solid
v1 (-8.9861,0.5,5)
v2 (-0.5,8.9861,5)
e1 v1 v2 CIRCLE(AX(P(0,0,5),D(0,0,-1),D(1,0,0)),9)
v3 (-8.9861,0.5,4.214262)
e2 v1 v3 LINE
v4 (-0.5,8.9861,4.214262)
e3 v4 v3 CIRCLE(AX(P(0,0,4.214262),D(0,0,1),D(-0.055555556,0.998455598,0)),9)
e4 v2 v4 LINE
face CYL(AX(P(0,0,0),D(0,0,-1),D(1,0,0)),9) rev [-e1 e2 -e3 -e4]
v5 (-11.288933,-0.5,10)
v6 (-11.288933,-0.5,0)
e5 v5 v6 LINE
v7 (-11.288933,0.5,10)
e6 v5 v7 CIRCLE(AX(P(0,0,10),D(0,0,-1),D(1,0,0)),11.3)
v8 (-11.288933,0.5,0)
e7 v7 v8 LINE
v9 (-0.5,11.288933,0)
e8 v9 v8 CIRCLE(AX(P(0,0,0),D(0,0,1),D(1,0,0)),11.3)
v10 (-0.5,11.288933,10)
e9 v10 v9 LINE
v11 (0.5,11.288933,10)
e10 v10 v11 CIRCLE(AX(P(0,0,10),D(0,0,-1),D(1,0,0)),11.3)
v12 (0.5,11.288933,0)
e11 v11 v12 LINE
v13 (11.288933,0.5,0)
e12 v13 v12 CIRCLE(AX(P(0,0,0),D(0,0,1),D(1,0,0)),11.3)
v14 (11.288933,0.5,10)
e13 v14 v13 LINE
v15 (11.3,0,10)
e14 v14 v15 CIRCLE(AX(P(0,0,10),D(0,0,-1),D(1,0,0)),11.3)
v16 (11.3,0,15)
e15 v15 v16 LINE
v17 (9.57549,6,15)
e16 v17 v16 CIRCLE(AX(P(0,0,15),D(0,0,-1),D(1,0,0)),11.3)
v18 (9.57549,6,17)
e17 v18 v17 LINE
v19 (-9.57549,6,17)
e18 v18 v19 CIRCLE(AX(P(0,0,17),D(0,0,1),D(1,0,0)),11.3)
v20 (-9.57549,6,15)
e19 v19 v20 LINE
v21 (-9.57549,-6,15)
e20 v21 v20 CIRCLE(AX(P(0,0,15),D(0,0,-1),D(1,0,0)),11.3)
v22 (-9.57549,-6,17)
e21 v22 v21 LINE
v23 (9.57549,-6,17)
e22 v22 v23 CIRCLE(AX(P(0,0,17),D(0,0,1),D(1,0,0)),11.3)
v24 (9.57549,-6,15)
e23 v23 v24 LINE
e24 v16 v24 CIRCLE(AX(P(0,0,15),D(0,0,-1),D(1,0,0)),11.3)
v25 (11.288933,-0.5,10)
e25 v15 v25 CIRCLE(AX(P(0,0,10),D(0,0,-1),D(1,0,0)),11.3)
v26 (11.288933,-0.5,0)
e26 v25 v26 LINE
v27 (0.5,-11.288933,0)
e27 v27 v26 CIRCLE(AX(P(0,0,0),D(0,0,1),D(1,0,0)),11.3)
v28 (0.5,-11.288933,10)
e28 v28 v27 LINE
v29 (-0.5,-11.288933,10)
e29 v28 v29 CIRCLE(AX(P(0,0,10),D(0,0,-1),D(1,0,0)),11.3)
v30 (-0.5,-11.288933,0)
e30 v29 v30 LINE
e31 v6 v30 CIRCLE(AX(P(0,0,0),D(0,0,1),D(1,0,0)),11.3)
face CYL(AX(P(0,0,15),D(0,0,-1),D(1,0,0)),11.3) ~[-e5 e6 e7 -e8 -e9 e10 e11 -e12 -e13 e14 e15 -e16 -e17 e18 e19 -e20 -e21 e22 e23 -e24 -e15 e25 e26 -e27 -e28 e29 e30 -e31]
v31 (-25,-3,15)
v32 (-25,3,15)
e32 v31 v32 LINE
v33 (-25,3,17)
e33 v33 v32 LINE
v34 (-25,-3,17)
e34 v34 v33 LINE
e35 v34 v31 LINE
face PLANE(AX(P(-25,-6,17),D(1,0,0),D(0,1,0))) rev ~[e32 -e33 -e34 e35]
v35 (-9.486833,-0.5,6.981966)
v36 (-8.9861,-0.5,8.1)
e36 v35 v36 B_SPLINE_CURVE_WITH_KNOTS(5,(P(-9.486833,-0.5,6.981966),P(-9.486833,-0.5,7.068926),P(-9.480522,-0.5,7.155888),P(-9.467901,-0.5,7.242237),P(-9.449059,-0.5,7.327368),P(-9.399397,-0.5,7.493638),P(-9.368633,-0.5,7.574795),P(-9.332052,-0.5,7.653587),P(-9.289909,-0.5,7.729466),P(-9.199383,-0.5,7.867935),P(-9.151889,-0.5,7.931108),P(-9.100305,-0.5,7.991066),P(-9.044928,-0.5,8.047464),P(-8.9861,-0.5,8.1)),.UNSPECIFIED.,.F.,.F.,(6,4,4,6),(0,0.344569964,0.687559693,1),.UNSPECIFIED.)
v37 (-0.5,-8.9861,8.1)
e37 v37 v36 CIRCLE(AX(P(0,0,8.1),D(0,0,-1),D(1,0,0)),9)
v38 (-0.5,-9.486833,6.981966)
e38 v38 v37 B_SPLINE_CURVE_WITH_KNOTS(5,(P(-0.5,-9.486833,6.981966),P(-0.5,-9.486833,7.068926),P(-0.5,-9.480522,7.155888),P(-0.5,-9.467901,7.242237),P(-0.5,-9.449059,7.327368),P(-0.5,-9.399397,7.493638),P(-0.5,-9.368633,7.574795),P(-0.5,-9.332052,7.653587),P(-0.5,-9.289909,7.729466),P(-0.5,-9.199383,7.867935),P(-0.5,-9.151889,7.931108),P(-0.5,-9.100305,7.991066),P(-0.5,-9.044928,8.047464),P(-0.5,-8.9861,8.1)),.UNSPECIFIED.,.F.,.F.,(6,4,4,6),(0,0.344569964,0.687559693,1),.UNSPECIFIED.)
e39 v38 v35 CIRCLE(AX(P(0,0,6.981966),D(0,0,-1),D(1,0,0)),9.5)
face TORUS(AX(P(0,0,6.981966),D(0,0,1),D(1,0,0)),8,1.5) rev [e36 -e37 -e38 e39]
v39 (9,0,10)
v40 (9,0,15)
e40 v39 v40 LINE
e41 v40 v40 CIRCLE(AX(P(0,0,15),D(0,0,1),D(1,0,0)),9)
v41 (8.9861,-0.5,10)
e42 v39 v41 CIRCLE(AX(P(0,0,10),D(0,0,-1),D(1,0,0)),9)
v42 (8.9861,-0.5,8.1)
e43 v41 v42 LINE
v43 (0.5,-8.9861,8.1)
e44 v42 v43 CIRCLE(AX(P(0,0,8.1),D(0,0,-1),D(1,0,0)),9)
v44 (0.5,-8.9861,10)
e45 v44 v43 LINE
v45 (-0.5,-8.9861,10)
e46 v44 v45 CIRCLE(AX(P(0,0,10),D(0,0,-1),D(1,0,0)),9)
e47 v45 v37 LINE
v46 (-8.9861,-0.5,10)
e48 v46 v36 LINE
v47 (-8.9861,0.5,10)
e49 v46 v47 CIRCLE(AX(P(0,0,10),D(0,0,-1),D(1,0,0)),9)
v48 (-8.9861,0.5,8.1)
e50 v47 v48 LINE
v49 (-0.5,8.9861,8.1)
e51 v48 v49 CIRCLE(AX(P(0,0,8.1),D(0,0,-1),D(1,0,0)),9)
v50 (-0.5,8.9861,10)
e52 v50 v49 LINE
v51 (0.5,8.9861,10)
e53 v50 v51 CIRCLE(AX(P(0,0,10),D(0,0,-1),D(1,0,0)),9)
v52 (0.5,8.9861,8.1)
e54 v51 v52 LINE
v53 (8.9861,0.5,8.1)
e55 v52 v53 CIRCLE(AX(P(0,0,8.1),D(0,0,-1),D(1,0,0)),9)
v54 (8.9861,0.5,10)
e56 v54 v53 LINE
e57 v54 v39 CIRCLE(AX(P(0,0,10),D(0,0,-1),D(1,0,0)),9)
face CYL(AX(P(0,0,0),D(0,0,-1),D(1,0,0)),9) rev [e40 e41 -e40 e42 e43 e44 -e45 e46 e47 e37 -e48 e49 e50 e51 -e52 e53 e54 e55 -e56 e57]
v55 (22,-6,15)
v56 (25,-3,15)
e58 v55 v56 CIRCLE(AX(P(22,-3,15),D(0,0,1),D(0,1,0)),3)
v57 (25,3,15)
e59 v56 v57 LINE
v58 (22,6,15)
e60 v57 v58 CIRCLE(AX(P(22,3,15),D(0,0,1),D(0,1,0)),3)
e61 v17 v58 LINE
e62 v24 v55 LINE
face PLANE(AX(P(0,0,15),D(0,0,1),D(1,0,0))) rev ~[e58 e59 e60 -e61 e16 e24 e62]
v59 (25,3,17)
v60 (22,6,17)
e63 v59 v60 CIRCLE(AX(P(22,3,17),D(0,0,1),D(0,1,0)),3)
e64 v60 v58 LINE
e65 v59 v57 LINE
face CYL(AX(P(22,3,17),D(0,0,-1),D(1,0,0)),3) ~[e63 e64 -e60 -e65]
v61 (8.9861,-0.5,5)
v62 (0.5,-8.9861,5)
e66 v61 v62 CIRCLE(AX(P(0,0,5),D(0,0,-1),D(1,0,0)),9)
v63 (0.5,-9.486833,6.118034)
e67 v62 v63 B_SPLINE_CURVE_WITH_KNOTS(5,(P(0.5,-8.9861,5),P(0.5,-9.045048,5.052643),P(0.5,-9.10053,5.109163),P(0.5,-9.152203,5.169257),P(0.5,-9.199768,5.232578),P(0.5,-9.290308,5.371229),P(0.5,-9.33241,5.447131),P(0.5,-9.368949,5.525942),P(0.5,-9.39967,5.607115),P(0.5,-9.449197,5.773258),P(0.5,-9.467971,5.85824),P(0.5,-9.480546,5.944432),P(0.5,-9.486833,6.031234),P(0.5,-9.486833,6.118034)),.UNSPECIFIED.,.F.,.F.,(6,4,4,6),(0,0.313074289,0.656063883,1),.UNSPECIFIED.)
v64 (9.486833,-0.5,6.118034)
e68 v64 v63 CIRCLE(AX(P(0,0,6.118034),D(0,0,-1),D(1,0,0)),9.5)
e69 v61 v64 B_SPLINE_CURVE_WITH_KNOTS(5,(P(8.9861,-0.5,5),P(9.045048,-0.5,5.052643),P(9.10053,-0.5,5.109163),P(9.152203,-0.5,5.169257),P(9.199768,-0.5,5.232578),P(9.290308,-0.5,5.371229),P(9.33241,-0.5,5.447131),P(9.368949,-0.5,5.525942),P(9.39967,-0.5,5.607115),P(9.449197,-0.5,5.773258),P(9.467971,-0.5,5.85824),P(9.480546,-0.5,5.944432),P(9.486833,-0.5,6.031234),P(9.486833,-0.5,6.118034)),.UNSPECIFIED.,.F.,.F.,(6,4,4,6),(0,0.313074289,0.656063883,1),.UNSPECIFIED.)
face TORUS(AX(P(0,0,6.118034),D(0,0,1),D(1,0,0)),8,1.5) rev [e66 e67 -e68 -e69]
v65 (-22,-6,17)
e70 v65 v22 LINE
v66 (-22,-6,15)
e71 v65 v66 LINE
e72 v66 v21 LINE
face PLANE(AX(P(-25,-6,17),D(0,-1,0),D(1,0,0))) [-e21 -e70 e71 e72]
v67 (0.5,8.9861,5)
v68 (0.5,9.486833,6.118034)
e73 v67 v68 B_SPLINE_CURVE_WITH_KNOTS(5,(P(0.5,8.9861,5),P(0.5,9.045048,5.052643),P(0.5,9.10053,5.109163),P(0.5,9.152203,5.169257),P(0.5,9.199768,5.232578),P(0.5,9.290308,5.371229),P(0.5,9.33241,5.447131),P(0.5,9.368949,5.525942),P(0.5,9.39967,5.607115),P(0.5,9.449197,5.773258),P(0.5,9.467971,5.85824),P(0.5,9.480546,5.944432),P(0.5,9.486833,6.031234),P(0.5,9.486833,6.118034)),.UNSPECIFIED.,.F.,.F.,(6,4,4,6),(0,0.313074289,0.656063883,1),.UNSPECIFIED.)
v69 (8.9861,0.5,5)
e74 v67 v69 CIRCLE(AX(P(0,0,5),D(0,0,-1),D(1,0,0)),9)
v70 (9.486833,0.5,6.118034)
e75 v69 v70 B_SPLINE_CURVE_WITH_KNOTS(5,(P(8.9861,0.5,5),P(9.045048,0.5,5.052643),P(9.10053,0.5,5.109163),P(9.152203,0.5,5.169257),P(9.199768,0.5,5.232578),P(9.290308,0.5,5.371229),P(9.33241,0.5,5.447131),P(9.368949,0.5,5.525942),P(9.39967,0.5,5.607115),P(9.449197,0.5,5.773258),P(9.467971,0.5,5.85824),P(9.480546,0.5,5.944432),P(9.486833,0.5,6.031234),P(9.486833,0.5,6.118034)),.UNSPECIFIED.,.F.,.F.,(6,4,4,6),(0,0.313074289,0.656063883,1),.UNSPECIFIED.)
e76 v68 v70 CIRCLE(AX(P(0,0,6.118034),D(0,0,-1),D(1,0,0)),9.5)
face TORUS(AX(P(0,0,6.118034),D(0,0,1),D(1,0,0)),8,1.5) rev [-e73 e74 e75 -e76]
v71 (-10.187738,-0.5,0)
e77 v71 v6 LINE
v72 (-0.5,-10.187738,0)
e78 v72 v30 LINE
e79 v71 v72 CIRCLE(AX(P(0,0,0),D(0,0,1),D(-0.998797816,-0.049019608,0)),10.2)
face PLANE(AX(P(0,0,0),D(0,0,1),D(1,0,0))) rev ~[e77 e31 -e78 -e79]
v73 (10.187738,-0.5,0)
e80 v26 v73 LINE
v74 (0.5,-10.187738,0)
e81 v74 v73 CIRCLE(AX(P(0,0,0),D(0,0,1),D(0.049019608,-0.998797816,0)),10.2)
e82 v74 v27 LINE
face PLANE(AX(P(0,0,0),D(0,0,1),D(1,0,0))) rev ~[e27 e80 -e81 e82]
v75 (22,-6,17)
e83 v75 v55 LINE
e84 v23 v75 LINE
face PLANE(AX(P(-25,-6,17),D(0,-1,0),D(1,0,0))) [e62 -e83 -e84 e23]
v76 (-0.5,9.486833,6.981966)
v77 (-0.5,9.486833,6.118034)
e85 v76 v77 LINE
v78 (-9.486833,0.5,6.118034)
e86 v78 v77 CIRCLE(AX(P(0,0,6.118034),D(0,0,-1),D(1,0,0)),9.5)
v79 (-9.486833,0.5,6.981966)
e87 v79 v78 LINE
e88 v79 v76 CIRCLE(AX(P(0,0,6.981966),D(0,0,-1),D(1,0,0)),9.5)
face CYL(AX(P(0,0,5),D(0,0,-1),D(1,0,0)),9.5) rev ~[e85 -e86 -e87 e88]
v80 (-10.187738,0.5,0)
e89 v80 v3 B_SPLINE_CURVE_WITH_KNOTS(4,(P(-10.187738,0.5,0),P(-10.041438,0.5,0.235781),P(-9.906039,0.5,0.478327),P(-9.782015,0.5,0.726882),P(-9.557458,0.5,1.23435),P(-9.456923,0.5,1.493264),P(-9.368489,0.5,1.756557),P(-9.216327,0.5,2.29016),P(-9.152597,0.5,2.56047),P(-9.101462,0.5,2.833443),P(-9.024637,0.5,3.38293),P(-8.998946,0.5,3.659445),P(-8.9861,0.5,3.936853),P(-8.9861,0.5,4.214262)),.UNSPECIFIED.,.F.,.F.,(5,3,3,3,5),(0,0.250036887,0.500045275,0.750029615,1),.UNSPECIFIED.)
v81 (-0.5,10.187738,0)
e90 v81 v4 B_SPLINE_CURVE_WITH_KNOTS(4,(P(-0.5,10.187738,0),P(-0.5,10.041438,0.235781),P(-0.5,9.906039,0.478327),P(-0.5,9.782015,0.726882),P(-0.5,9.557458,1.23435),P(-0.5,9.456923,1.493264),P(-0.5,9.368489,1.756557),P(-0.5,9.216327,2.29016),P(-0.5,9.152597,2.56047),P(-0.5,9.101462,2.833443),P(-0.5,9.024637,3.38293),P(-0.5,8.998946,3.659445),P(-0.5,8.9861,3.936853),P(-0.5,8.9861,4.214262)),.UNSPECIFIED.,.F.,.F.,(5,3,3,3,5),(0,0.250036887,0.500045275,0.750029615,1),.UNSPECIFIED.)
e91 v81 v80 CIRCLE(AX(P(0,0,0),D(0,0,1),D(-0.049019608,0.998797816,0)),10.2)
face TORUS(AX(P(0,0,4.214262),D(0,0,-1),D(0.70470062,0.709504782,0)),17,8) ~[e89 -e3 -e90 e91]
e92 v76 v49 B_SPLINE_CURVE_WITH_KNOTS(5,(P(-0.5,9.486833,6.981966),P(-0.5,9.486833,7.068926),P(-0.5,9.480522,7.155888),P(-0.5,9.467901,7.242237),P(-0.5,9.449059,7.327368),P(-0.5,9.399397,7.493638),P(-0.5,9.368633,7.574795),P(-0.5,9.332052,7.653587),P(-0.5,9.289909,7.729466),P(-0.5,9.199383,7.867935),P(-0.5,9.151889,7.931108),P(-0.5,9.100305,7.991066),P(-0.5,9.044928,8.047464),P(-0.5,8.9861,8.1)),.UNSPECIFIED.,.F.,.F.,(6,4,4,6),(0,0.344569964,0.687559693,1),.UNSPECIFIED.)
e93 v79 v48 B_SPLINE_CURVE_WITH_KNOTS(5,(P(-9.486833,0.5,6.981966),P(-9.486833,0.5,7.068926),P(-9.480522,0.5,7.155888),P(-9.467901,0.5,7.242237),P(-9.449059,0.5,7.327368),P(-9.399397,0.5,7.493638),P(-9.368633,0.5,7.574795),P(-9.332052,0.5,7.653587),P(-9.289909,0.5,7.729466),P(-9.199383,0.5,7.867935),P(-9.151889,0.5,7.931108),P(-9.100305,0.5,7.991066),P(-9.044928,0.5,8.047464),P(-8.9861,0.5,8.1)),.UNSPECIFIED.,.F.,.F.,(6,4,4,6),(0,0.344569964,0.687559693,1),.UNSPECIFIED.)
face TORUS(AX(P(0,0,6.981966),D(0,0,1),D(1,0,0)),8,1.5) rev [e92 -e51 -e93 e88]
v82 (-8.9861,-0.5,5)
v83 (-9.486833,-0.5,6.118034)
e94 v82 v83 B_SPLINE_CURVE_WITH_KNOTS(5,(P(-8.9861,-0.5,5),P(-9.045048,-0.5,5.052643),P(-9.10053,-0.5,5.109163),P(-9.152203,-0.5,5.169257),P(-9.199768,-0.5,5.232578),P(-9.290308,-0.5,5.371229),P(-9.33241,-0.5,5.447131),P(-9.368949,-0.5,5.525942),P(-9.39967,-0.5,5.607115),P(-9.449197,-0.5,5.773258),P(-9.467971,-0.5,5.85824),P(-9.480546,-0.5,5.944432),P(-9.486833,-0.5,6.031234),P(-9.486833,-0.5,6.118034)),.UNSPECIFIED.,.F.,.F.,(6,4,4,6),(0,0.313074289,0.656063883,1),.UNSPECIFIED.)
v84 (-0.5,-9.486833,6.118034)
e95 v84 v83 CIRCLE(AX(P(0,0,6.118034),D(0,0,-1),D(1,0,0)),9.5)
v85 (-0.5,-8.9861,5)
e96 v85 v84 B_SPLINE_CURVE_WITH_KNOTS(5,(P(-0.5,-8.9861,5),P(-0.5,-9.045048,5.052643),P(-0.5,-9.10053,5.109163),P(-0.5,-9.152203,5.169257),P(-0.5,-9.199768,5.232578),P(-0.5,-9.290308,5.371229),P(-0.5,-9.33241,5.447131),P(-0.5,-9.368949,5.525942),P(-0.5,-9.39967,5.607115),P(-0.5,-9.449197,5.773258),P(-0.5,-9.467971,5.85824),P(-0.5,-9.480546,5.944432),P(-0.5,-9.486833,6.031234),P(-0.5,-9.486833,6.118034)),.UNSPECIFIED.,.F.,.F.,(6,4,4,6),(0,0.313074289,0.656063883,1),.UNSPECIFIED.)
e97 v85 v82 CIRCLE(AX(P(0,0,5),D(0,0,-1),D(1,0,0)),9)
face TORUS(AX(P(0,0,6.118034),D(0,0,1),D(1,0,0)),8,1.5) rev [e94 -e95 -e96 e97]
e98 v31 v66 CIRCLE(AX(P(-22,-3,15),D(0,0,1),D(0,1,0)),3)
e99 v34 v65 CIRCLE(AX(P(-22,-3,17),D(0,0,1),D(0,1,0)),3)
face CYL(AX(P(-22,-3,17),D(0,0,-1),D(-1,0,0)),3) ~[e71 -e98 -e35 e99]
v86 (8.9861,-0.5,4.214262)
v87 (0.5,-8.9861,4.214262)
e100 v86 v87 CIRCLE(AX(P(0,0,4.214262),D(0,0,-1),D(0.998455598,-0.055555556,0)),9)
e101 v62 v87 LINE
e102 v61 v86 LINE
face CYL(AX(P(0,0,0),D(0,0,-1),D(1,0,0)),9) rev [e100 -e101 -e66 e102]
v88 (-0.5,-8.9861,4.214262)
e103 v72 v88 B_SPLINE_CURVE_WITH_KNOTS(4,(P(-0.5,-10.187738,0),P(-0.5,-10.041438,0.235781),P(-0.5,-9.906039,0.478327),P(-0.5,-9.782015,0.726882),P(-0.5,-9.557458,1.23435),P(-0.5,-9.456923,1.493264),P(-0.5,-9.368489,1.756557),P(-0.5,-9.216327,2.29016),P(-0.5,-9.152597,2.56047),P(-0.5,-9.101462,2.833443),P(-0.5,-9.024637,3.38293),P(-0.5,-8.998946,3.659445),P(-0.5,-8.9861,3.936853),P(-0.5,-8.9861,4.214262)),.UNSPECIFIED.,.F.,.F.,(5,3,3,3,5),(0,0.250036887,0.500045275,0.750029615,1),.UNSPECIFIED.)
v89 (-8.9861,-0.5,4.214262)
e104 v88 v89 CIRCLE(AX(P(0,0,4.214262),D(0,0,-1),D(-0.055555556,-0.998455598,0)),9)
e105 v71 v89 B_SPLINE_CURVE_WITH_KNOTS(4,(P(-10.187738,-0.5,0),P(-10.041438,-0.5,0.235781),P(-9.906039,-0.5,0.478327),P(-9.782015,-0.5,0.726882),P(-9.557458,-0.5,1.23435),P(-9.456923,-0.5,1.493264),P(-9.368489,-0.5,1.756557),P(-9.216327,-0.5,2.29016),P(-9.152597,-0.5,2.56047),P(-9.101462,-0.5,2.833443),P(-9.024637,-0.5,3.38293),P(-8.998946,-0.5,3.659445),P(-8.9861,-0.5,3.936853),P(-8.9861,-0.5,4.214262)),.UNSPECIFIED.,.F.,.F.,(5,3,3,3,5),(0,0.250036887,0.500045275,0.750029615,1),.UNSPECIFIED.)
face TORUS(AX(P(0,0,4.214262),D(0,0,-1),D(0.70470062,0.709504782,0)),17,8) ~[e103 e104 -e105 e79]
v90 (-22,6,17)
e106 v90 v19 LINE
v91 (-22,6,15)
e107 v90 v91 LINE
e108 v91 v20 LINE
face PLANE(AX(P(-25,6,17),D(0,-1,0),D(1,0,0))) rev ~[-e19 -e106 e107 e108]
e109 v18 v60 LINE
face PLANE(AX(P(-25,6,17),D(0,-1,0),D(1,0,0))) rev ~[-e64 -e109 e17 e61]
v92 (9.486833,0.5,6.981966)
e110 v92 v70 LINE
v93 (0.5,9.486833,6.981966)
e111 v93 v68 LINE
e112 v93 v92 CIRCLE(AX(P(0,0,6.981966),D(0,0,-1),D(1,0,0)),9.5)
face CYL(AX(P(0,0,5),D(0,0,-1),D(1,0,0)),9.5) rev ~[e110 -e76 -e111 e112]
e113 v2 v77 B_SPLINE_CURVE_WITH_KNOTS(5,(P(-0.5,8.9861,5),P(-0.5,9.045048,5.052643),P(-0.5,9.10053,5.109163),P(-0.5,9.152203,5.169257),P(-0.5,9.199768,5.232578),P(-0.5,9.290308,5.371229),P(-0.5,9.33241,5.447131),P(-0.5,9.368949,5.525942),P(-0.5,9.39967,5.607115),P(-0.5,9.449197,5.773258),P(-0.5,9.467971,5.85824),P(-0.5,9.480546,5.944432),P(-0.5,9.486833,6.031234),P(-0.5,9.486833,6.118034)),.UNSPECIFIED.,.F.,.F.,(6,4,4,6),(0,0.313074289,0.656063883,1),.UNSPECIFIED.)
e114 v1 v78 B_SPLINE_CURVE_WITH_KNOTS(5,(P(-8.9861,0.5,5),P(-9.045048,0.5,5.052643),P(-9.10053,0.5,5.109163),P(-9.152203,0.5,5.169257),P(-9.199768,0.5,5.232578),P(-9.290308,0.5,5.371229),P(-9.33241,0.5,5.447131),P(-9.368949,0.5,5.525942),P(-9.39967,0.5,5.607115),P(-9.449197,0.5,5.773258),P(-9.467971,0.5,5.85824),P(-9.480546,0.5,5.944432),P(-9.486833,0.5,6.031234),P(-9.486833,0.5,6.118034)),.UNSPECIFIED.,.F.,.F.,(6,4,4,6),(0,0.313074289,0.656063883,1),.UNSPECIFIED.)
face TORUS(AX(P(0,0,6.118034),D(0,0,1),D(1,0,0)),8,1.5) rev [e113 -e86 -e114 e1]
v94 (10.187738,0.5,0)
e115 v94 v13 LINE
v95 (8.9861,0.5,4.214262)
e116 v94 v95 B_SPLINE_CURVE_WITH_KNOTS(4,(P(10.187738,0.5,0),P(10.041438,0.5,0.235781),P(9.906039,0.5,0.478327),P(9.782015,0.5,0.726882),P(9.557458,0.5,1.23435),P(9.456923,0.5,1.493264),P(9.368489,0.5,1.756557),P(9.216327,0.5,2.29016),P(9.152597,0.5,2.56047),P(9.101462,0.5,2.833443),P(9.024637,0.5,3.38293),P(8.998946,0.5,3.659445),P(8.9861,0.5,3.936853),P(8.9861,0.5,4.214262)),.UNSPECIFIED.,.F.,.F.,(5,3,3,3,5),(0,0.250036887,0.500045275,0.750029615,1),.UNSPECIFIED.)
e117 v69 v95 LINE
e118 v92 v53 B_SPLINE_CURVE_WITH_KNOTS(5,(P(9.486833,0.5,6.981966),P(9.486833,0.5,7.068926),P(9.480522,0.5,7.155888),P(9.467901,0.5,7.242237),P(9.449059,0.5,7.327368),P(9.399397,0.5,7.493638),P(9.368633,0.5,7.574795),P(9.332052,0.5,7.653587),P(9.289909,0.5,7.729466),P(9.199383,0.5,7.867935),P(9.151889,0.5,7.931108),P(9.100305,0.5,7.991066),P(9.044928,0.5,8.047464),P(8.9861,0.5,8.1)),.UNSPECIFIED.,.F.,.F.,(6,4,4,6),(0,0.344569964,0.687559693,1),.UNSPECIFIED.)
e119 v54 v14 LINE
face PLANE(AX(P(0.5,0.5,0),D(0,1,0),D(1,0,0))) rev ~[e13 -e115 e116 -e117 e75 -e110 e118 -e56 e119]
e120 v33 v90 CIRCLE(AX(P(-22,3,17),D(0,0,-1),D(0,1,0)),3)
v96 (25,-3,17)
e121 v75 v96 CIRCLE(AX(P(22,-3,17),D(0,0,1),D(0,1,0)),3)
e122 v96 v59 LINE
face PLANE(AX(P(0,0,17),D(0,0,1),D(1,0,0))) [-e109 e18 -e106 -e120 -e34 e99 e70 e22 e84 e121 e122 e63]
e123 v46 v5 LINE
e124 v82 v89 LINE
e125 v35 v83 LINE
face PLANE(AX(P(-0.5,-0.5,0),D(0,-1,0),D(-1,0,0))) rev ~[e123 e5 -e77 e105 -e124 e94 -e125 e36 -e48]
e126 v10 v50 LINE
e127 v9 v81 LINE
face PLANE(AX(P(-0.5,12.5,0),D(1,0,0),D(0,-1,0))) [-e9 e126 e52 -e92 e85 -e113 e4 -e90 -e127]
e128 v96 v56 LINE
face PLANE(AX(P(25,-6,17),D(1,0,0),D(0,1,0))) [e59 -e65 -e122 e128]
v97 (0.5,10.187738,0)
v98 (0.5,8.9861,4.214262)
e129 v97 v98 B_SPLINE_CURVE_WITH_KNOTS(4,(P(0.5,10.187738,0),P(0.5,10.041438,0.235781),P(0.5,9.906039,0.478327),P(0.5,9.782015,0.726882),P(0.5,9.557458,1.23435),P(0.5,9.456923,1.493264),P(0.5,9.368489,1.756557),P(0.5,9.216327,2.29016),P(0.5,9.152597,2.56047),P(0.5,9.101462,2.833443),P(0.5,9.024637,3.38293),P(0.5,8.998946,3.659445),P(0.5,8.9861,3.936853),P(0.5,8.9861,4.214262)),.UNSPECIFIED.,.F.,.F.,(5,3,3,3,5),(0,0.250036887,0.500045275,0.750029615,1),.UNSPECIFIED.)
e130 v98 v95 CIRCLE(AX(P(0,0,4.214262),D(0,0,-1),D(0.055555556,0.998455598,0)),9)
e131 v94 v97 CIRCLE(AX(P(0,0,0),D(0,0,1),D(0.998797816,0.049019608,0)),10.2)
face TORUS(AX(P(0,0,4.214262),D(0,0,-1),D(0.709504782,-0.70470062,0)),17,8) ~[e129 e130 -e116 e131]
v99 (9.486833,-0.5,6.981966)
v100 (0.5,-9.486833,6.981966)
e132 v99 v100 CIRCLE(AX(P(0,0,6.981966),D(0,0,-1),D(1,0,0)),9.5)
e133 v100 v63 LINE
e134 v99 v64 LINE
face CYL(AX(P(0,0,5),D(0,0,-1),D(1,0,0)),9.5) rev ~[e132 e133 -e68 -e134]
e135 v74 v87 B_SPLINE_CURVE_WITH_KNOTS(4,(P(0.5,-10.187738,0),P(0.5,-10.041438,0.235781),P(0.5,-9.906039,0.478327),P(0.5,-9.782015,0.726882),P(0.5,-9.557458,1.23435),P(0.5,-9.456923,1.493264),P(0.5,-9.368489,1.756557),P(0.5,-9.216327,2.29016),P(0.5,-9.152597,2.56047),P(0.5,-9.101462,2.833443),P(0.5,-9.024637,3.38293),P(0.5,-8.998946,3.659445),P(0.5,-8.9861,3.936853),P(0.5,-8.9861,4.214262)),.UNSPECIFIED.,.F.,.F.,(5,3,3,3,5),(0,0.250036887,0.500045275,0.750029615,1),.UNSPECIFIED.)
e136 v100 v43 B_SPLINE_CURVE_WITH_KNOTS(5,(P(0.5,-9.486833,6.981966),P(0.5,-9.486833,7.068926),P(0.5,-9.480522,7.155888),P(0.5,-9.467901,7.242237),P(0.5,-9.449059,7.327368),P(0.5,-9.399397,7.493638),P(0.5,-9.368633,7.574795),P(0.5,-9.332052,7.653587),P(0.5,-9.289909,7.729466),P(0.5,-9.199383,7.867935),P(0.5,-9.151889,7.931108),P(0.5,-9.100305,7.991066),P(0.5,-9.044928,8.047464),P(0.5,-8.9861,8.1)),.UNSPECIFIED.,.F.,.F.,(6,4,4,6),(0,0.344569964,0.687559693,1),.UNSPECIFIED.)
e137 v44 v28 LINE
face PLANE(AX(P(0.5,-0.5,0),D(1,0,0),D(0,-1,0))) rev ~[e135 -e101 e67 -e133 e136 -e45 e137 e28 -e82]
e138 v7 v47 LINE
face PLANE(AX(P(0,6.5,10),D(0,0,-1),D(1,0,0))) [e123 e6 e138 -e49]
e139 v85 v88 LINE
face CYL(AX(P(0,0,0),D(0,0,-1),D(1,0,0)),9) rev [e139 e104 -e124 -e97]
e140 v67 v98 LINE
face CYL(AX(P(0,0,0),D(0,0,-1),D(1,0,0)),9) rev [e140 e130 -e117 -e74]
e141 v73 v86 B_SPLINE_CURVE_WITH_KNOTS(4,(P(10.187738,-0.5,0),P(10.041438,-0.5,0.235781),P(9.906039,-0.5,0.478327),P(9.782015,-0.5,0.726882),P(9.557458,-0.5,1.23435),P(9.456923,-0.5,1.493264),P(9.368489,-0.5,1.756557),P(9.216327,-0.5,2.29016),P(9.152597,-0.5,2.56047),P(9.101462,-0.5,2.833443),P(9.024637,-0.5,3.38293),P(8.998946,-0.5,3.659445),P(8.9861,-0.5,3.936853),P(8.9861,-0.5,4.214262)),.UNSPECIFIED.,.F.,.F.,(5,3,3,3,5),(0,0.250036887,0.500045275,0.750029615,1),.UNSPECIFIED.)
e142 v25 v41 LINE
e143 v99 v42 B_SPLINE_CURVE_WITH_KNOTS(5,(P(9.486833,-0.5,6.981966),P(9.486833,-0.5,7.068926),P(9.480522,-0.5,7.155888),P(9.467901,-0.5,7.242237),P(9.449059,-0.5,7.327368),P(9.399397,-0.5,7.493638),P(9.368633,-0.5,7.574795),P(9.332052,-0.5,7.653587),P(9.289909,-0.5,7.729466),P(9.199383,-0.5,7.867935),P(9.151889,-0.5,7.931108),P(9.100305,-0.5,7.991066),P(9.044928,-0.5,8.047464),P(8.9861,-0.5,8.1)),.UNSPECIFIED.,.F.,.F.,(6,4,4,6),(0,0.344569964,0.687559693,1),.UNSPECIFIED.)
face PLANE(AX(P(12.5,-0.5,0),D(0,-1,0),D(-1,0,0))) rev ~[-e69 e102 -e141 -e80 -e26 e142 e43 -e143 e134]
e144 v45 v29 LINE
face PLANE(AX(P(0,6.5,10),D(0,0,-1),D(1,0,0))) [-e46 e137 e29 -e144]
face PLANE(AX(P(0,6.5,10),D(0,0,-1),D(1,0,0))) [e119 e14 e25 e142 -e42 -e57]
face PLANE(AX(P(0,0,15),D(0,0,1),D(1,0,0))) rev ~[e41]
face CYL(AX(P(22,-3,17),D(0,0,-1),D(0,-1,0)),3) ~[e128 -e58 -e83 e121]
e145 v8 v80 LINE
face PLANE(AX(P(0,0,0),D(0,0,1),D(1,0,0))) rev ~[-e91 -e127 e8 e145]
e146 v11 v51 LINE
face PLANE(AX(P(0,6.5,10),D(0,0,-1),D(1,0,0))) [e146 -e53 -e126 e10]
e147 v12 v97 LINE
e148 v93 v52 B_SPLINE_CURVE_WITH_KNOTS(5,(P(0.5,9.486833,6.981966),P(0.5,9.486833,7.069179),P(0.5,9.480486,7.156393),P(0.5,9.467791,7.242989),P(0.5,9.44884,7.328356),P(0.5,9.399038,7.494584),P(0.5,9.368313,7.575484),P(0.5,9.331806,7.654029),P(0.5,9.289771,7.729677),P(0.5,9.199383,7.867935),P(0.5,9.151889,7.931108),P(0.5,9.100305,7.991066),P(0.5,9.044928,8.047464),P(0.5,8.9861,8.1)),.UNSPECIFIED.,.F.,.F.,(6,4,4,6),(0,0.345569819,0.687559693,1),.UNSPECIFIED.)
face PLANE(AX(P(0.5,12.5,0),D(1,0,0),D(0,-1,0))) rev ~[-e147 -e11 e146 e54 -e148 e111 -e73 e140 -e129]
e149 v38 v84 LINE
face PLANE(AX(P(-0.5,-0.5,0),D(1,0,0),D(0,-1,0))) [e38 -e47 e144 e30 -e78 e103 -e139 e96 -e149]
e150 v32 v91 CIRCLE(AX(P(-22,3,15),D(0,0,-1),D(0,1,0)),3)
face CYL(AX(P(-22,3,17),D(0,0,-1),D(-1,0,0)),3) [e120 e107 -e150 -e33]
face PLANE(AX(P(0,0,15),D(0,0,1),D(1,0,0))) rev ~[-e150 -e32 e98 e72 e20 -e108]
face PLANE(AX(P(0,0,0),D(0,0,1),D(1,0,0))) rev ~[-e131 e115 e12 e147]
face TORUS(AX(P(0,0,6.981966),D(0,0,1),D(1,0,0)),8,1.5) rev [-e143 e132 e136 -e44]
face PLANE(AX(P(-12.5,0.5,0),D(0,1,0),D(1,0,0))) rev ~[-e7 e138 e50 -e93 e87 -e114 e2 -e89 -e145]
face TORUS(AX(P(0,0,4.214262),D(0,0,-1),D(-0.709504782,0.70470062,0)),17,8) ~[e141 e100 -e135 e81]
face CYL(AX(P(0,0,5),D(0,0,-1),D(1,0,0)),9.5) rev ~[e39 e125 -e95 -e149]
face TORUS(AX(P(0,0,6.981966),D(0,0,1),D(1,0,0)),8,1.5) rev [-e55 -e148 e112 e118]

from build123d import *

# Parameters (mm, degrees)
F0_R         = 11.3
F0_R_2       = 9
F1_DEPTH     = 15
F2_R         = 11.3
F3_DEPTH     = 2
F5_START     = -5
F4_R         = 9.5
F4_R_2       = 7.1437360255
F5_DEPTH     = 3.1
F7_W         = 50
F7_H         = 12
F8_DEPTH     = 2
F9_R         = 3
F10_W        = 1
F10_H        = 12
F10_W_2      = 12
F10_H_2      = 1
F11_DEPTH    = 10
F12_SIZE     = 1.2
F13_T2_ANGLE = 179.6107254138
F13_T4_ANGLE = 179.6107254138
F13_T6_ANGLE = 179.6107254138
F13_T8_ANGLE = 179.6107254138


# Not quite as in the source:
# - a fillet or chamfer that OpenCascade refuses, or shapes differently, is made with other operations: its cross-section is extruded or revolved along the edge and cut away or added


with BuildPart() as f1:
    # F0 (on Top) → F1 (new body)
    with BuildSketch(Plane.XY):
        Circle(F0_R)
        Circle(F0_R_2, mode=Mode.SUBTRACT)
    extrude(amount=F1_DEPTH)

    # F2 (on face) → F3 (join)
    with BuildSketch(Plane.XY.offset(15)):
        Circle(F2_R)
    extrude(amount=F3_DEPTH)

    # F4 (on face) → F5 (cut)
    with BuildSketch(Plane(origin=(0, 0, 0), x_dir=(1, 0, 0), z_dir=(0, 0, -1)).offset(F5_START)):
        Circle(F4_R)
        Circle(F4_R_2, mode=Mode.SUBTRACT)
    extrude(amount=-F5_DEPTH, mode=Mode.SUBTRACT)

    # F6: fillet of radius 1.5 on 3 edges, made by hand

    # F6_s1 → F6_t2 (revolve)
    with BuildSketch(Plane.XZ):
        with BuildLine():
            ThreePointArc((9, 5), (9.3693063938, 5.5056615531), (9.5, 6.1180339887))
            Line((9.5, 6.1180339887), (9.53, 6.1180339887))
            Line((9.53, 6.1180339887), (9.53, 5))
            Line((9.53, 5), (9.5, 4.97))
            ThreePointArc((9.5, 4.97), (9.25, 4.97), (9.02, 4.9776393202))
            Line((9.02, 4.9776393202), (9, 5))
        make_face()
    revolve(axis=Axis((0, 0, 5), (0, 0, -1)))

    # F6_s3 → F6_t4 (revolve)
    with BuildSketch(Plane.XZ):
        with BuildLine():
            ThreePointArc((9.5, 6.9819660113), (9.3693063938, 7.5943384469), (9, 8.1))
            Line((9, 8.1), (9.02, 8.1223606798))
            ThreePointArc((9.02, 8.1223606798), (9.25, 8.13), (9.5, 8.13))
            Line((9.5, 8.13), (9.53, 8.1))
            Line((9.53, 8.1), (9.53, 6.9819660113))
            Line((9.53, 6.9819660113), (9.5, 6.9819660113))
        make_face()
    revolve(axis=Axis((0, 0, 8.1), (0, 0, -1)))

    # F7 (on face) → F8 (join)
    with BuildSketch(Plane.XY.offset(17)):
        Rectangle(F7_W, F7_H)
    extrude(amount=-F8_DEPTH)

    # F9
    f9_edges = [f1.edges().sort_by_distance(p)[0] for p in [
        (-25, 6, 16),
        (-25, -6, 16),
        (25, 6, 16),
        (25, -6, 16),
    ]]
    fillet(f9_edges, radius=F9_R)

    # F10 (on face) → F11 (cut)
    with BuildSketch(Plane(origin=(0, 0, 0), x_dir=(1, 0, 0), z_dir=(0, 0, -1))):
        with Locations((0, -6.5)):
            Rectangle(F10_W, F10_H)
        with Locations((-6.5, 0)):
            Rectangle(F10_W_2, F10_H_2)
        Rectangle(F10_W, F10_H_2)
        with Locations((6.5, 0)):
            Rectangle(F10_W_2, F10_H_2)
        with Locations((0, 6.5)):
            Rectangle(F10_W, F10_H)
    extrude(amount=-F11_DEPTH, mode=Mode.SUBTRACT)

    # F12
    f12_edges = [f1.edges().sort_by_distance(p)[0] for p in [
        (6.363961, 6.363961, 0),
        (-6.363961, 6.363961, 0),
        (-6.363961, -6.363961, 0),
        (6.363961, -6.363961, 0),
    ]]
    chamfer(f12_edges, length=F12_SIZE)

    # F13: fillet of radius 8 on 4 edges, made by hand

    # F13_s1 → F13_t2 (revolve, cut)
    with BuildSketch(Plane(origin=(0, 0, 0), x_dir=(0, 0, 1), z_dir=(0.7095047819, -0.7047006205, 0))):
        with BuildLine():
            ThreePointArc((0, -10.2), (2.0233712711, -9.3058463753), (4.2142615011, -9))
            Line((4.2142615011, -9), (1.2, -9))
            Line((1.2, -9), (0, -10.2))
        make_face()
    revolve(axis=Axis((0, 0, 1.2), (0, 0, 1)), revolution_arc=F13_T2_ANGLE, mode=Mode.SUBTRACT)

    # F13_s3 → F13_t4 (revolve, cut)
    with BuildSketch(Plane(origin=(0, 0, 0), x_dir=(0, 0, 1), z_dir=(0.7047006205, 0.7095047819, 0))):
        with BuildLine():
            ThreePointArc((0, -10.2), (2.0233712711, -9.3058463753), (4.2142615011, -9))
            Line((4.2142615011, -9), (1.2, -9))
            Line((1.2, -9), (0, -10.2))
        make_face()
    revolve(axis=Axis((0, 0, 1.2), (0, 0, 1)), revolution_arc=F13_T4_ANGLE, mode=Mode.SUBTRACT)

    # F13_s5 → F13_t6 (revolve, cut)
    with BuildSketch(Plane(origin=(0, 0, 0), x_dir=(0, 0, 1), z_dir=(-0.7047006205, -0.7095047819, 0))):
        with BuildLine():
            ThreePointArc((0, -10.2), (2.0233712711, -9.3058463753), (4.2142615011, -9))
            Line((4.2142615011, -9), (1.2, -9))
            Line((1.2, -9), (0, -10.2))
        make_face()
    revolve(axis=Axis((0, 0, 1.2), (0, 0, 1)), revolution_arc=F13_T6_ANGLE, mode=Mode.SUBTRACT)

    # F13_s7 → F13_t8 (revolve, cut)
    with BuildSketch(Plane(origin=(0, 0, 0), x_dir=(0, 0, 1), z_dir=(-0.7095047819, 0.7047006205, 0))):
        with BuildLine():
            ThreePointArc((0, -10.2), (2.0233712711, -9.3058463753), (4.2142615011, -9))
            Line((4.2142615011, -9), (1.2, -9))
            Line((1.2, -9), (0, -10.2))
        make_face()
    revolve(axis=Axis((0, 0, 1.2), (0, 0, 1)), revolution_arc=F13_T8_ANGLE, mode=Mode.SUBTRACT)


solid = f1.part
